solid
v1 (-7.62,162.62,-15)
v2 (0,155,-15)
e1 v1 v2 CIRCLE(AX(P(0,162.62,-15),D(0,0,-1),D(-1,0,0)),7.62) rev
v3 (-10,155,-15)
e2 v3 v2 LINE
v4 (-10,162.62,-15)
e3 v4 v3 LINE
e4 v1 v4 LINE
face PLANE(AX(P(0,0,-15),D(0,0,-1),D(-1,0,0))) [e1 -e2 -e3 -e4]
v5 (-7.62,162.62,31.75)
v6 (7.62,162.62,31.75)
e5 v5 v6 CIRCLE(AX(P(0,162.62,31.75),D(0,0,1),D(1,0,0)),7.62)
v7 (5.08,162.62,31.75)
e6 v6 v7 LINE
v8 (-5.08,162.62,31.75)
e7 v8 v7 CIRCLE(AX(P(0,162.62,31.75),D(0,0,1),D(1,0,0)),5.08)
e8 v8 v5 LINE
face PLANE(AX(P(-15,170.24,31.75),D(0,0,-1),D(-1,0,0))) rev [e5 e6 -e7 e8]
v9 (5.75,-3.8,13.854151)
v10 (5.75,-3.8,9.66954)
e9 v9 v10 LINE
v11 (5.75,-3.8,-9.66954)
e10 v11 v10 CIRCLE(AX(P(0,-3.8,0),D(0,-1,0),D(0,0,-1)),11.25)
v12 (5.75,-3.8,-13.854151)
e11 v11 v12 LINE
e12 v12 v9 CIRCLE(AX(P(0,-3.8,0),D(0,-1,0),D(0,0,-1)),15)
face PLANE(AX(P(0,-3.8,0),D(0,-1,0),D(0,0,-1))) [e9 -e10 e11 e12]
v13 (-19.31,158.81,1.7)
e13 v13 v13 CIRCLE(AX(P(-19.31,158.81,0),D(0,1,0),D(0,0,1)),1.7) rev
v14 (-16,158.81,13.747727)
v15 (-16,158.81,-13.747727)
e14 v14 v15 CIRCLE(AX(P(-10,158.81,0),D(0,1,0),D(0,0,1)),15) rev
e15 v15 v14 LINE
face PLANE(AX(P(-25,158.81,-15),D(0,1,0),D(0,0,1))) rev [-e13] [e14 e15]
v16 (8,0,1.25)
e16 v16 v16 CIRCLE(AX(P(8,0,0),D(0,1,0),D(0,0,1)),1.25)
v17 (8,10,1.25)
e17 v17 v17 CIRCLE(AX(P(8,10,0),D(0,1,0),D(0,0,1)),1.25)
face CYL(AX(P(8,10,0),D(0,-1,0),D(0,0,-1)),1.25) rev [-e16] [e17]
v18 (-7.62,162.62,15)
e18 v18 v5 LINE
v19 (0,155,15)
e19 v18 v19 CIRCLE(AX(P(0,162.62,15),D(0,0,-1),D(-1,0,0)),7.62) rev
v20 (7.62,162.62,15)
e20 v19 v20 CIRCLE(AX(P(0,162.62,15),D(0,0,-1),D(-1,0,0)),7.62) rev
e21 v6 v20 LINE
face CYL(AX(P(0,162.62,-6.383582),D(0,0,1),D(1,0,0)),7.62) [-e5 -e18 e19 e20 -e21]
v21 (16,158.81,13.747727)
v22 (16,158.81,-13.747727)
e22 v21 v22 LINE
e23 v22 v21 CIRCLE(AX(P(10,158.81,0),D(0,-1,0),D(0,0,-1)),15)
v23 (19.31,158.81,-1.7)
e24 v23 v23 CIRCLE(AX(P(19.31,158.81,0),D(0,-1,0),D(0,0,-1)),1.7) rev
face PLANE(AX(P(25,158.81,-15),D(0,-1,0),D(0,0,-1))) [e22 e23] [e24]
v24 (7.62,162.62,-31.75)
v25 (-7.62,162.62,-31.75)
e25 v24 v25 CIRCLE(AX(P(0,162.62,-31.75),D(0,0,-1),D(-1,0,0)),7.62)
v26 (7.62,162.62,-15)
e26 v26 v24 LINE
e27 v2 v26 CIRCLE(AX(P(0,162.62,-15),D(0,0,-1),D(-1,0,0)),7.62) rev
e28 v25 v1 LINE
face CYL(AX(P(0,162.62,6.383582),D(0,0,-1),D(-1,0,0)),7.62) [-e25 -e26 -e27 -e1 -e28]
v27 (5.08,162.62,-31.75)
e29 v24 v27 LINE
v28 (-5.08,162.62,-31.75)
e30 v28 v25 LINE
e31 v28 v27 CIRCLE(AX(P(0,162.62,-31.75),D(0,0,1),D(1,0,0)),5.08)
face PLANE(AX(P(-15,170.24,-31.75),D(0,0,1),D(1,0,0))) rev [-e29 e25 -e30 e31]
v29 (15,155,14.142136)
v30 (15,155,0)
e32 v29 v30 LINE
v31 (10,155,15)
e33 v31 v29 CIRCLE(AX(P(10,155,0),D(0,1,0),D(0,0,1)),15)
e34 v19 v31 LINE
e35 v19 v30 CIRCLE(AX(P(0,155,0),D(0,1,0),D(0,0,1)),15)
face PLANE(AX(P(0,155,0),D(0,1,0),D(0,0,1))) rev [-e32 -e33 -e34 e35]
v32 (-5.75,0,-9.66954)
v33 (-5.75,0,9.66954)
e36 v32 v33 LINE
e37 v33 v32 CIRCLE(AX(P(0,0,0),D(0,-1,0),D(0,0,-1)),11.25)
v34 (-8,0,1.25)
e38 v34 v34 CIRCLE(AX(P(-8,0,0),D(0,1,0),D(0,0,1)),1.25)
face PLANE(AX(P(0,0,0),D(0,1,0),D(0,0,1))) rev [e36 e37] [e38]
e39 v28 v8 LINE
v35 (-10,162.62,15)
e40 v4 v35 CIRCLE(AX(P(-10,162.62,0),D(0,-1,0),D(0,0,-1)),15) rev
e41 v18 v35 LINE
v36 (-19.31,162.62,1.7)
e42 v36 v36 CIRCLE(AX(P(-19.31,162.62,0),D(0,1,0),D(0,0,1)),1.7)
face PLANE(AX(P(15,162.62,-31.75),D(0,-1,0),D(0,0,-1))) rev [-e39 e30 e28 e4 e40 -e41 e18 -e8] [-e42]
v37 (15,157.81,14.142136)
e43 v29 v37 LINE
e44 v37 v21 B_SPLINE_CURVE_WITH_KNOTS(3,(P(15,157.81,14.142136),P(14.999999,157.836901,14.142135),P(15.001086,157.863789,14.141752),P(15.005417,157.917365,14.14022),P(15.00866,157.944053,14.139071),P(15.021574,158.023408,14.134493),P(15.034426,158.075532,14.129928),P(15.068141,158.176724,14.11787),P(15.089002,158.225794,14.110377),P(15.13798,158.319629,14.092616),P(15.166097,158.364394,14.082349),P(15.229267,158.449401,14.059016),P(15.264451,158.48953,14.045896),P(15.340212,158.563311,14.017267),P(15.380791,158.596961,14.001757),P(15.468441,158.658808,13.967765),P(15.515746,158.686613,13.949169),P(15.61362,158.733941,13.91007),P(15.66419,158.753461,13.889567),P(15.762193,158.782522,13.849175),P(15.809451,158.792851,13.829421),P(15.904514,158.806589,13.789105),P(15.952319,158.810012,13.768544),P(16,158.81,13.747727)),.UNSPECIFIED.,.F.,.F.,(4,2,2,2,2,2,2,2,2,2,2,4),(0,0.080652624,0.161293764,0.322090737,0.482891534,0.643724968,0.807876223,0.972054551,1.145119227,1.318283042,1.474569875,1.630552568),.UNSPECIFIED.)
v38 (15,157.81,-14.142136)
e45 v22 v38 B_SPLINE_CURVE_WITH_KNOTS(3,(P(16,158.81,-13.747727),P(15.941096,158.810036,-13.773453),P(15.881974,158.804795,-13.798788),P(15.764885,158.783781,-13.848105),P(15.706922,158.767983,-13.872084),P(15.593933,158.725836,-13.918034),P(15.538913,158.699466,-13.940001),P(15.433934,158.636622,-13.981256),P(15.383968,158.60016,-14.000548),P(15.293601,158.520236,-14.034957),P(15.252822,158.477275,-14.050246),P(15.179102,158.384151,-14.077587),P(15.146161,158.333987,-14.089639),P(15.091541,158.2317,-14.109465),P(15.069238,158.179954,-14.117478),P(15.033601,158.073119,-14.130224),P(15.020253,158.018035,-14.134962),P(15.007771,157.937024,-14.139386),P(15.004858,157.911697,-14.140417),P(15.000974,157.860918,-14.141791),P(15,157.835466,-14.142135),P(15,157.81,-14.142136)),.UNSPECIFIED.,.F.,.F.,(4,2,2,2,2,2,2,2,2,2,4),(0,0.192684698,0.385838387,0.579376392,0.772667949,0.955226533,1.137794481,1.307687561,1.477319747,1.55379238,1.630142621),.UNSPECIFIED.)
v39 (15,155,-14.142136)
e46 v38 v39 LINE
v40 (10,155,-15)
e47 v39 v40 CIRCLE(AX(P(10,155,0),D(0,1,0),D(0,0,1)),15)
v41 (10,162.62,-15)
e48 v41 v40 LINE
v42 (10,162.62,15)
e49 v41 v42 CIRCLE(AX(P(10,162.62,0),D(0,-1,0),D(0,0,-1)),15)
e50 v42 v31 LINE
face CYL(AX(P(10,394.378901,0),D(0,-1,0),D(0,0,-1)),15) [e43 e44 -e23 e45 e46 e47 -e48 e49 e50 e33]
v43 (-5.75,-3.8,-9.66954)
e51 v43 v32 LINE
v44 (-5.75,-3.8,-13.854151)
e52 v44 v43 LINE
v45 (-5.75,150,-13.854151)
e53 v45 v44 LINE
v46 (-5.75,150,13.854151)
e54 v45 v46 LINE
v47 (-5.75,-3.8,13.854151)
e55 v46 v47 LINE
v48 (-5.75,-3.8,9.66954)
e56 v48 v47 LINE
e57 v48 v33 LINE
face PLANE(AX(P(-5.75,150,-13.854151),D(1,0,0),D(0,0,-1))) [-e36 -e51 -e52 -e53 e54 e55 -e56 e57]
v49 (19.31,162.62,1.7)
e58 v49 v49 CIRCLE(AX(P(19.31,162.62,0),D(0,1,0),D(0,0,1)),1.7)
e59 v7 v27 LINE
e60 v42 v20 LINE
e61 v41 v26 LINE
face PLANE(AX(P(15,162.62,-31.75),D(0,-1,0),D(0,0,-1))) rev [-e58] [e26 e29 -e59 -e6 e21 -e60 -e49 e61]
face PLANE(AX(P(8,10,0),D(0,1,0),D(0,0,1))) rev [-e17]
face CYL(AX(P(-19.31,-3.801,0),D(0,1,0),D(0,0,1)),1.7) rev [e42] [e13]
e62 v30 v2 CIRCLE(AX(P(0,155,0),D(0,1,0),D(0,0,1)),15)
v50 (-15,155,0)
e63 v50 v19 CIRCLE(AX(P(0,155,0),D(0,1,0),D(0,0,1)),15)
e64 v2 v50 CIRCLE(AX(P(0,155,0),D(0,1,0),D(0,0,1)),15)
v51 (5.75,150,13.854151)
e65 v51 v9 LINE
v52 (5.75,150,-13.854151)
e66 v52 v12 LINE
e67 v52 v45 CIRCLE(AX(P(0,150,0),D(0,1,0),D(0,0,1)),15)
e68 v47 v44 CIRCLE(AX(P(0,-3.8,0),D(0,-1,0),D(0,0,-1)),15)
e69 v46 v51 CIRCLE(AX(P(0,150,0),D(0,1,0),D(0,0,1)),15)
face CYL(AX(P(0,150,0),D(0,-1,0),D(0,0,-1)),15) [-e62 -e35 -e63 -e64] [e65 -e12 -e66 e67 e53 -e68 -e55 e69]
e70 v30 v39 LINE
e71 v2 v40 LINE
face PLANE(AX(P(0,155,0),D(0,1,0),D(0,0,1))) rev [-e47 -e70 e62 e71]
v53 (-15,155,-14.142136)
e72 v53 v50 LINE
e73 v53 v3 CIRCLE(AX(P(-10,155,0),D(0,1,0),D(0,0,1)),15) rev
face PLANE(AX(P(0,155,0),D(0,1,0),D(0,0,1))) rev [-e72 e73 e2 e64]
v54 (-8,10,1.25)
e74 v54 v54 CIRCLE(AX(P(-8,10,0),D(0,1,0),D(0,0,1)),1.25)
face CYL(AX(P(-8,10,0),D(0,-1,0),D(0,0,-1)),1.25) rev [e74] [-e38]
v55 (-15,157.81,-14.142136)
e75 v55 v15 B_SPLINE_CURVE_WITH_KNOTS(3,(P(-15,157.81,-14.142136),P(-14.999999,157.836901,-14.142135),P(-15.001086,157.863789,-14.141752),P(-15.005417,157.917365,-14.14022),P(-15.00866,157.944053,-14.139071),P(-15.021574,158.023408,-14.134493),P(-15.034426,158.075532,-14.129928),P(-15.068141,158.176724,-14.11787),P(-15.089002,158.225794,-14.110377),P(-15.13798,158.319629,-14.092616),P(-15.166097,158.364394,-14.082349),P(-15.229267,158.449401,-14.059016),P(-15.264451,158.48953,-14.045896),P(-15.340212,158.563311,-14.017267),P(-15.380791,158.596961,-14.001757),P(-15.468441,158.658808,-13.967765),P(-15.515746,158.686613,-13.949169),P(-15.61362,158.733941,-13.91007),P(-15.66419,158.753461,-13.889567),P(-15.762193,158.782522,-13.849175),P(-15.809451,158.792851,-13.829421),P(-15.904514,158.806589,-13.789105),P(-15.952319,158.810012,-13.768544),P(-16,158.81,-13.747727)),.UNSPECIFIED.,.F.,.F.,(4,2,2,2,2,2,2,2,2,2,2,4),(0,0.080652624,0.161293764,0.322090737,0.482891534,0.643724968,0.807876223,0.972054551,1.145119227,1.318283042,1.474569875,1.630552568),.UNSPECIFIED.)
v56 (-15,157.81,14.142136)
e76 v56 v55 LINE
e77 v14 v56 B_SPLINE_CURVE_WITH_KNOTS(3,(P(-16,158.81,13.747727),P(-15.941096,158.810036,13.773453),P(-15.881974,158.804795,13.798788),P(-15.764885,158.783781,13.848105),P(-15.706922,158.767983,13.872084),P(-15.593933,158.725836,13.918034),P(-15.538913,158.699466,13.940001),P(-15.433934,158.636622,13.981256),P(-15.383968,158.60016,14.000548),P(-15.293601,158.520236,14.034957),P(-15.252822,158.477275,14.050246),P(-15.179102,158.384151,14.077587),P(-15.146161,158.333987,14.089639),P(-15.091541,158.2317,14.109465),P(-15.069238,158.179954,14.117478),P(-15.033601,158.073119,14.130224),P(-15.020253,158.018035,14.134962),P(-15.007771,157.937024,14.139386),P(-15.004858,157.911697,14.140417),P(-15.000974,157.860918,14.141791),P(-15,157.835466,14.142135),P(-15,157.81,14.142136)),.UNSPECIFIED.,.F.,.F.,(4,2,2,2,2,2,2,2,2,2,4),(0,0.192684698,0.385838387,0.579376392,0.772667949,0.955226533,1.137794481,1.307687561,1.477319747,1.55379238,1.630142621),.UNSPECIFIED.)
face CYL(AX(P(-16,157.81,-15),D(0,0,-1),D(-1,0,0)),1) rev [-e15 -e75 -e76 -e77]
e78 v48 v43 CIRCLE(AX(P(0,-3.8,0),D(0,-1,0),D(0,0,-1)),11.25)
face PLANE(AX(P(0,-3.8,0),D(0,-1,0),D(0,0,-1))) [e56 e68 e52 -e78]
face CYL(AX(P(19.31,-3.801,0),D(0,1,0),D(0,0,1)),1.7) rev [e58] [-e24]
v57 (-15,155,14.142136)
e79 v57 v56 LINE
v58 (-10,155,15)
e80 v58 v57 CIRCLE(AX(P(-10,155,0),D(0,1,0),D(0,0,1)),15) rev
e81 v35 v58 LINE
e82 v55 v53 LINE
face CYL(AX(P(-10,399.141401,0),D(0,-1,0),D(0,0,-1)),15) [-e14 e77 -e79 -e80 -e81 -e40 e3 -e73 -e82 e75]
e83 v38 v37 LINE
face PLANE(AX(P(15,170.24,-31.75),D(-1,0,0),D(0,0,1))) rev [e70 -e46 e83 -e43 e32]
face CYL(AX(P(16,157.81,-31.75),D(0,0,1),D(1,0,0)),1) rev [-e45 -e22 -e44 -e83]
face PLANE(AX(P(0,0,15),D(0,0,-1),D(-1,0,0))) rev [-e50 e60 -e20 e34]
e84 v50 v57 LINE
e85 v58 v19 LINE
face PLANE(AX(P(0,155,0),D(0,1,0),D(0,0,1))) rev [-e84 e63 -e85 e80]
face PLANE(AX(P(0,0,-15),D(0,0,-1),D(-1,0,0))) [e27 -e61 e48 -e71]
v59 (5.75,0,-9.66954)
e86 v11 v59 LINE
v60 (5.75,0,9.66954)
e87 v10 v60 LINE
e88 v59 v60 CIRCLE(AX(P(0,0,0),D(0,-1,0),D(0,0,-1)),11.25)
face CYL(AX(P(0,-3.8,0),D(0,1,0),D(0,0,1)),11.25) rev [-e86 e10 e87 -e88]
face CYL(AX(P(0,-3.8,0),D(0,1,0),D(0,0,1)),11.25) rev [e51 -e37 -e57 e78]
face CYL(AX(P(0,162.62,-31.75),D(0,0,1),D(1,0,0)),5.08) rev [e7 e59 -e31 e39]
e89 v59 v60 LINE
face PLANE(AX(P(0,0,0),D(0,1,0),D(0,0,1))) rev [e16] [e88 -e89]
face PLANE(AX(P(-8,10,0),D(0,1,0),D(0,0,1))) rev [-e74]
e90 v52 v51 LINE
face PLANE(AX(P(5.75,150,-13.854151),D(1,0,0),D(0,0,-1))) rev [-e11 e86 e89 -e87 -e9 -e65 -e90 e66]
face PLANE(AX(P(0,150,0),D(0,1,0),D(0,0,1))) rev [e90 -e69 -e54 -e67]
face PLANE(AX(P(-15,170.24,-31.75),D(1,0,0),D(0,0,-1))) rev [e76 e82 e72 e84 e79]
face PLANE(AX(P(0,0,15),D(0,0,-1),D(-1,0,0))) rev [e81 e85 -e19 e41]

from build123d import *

# Parameters (mm, degrees)
BOSS_EXTRUDE1_DEPTH   = 150
BOSS_EXTRUDE1_2_DEPTH = 150
SKETCH2_R             = 15
BOSS_EXTRUDE2_DEPTH   = 5
SKETCH3_W             = 30
SKETCH3_H             = 63.5
BOSS_EXTRUDE3_DEPTH   = 15.24
SKETCH4_R             = 5.08
CUT_EXTRUDE1_DEPTH    = 183.315406919
CUT_EXTRUDE3_START    = -16.75
CUT_EXTRUDE3_DEPTH    = 16.75
CUT_EXTRUDE4_START    = -16.75
CUT_EXTRUDE4_DEPTH    = 16.75
SKETCH7_W             = 63.5
SKETCH7_H             = 7.62
CUT_EXTRUDE5_DEPTH    = 176.754715726
SKETCH8_W             = 30
SKETCH8_H             = 3.81
BOSS_EXTRUDE4_DEPTH   = 10
CUT_EXTRUDE6_START    = -7.62
CUT_EXTRUDE6_DEPTH    = 7.62
SKETCH1_4_R           = 1.25
CUT_EXTRUDE7_DEPTH    = 10
BOSS_EXTRUDE5_START   = 3.8
BOSS_EXTRUDE5_DEPTH   = 3.8
FILLET1_R             = 1
CUT_EXTRUDE8_REACH    = 173.256
SKETCH9_R             = 1.7


# Read off the part's stored shape, not the designer's step: Cut-Extrude6
with BuildPart() as part:
    # Sketch1 → Boss-Extrude1 (new body)
    with BuildSketch(Plane(origin=(0, 0, 0), x_dir=(1, 0, 0), z_dir=(0, 1, 0))):
        with BuildLine():
            Line((-5.75, 13.854151002), (-5.75, -13.854151002))
            ThreePointArc((-5.75, -13.854151002), (-15, 0), (-5.75, 13.854151002))
        make_face()
    extrude(amount=BOSS_EXTRUDE1_DEPTH)



with BuildPart() as body_2:
    # Sketch1 → Boss-Extrude1 2 (new body)
    with BuildSketch(Plane(origin=(0, 0, 0), x_dir=(1, 0, 0), z_dir=(0, 1, 0))):
        with BuildLine():
            Line((5.75, 13.854151002), (5.75, -13.854151002))
            ThreePointArc((5.75, -13.854151002), (15, 0), (5.75, 13.854151002))
        make_face()
    extrude(amount=BOSS_EXTRUDE1_2_DEPTH)


with BuildPart() as part_1:
    add(part.part)

    add(body_2.part)  # Boss-Extrude2 merges body 2
    # Sketch2 → Boss-Extrude2 (add)
    with BuildSketch(Plane(origin=(0, 150, 0), x_dir=(1, 0, 0), z_dir=(0, 1, 0))):
        with Locations(Location((0, 0, 0), (0, 0, 112.540310464))):
            Circle(SKETCH2_R)
    extrude(amount=BOSS_EXTRUDE2_DEPTH)

    # Sketch3 → Boss-Extrude3 (add)
    with BuildSketch(Plane(origin=(0, 155, 0), x_dir=(1, 0, 0), z_dir=(0, 1, 0))):
        Rectangle(SKETCH3_W, SKETCH3_H)
    extrude(amount=BOSS_EXTRUDE3_DEPTH)

    # Sketch4 → Cut-Extrude1 (cut, through all)
    with BuildSketch(Plane.XY.offset(31.75)):
        with Locations((0, 162.62)):
            Circle(SKETCH4_R)
    extrude(amount=-CUT_EXTRUDE1_DEPTH, mode=Mode.SUBTRACT)

    # Sketch6 → Cut-Extrude3 (cut)
    with BuildSketch(Plane(origin=(0, 0, -31.75), x_dir=(-1, 0, 0), z_dir=(0, 0, -1)).offset(CUT_EXTRUDE3_START)):
        with BuildLine():
            ThreePointArc((-9.9e-08, 170.24), (7.62, 162.62000005), (0, 155))
            Line((0, 155), (15, 155))
            Line((15, 155), (15, 170.24))
            Line((15, 170.24), (-9.9e-08, 170.24))
        make_face()
        with BuildLine():
            ThreePointArc((0, 155), (-7.62, 162.61999995), (-9.9e-08, 170.24))
            Line((-9.9e-08, 170.24), (-15, 170.24))
            Line((-15, 170.24), (-15, 155))
            Line((-15, 155), (0, 155))
        make_face()
    extrude(amount=CUT_EXTRUDE3_DEPTH, mode=Mode.SUBTRACT)

    # Sketch4<4> → Cut-Extrude4 (cut)
    with BuildSketch(Plane.XY.offset(31.75).offset(CUT_EXTRUDE4_START)):
        with BuildLine():
            ThreePointArc((-9.9e-08, 170.24), (7.62, 162.62000005), (0, 155))
            Line((0, 155), (15, 155))
            Line((15, 155), (15, 170.24))
            Line((15, 170.24), (-9.9e-08, 170.24))
        make_face()
        with BuildLine():
            ThreePointArc((0, 155), (-7.62, 162.61999995), (-9.9e-08, 170.24))
            Line((-9.9e-08, 170.24), (-15, 170.24))
            Line((-15, 170.24), (-15, 155))
            Line((-15, 155), (0, 155))
        make_face()
    extrude(amount=CUT_EXTRUDE4_DEPTH, mode=Mode.SUBTRACT)

    # Sketch7 → Cut-Extrude5 (cut, through all)
    with BuildSketch(Plane.ZY.offset(15)):
        with Locations((0, 166.43)):
            Rectangle(SKETCH7_W, SKETCH7_H)
    extrude(amount=-CUT_EXTRUDE5_DEPTH, mode=Mode.SUBTRACT)

    # Sketch8 → Boss-Extrude4 (add)
    with BuildSketch(Plane.ZY.offset(15)):
        with Locations((0, 160.715)):
            Rectangle(SKETCH8_W, SKETCH8_H)
    boss_extrude4 = extrude(amount=BOSS_EXTRUDE4_DEPTH)

    # Mirror2: Boss-Extrude4 across plane
    add(boss_extrude4.mirror(Plane(origin=(0, 0, 0), x_dir=(0, 0, 1), z_dir=(1, 0, 0))))

    # Cut-Extrude6 outline → Cut-Extrude6 (cut)
    with BuildSketch(Plane(origin=(0, 162.62, 0), x_dir=(1, 0, 0), z_dir=(0, 1, 0)).offset(CUT_EXTRUDE6_START)):
        with BuildLine():
            Line((25, 15), (10, 15))
            ThreePointArc((10, 15), (20.606601718, 10.606601718), (25, 0))
            Line((25, 0), (25, 15))
        make_face()
        with BuildLine():
            Line((25, -15), (25, 0))
            ThreePointArc((25, 0), (20.606601718, -10.606601718), (10, -15))
            Line((10, -15), (25, -15))
        make_face()
    cut_extrude6 = extrude(amount=CUT_EXTRUDE6_DEPTH, mode=Mode.SUBTRACT)

    # Mirror3: Cut-Extrude6 across plane
    add(cut_extrude6.mirror(Plane(origin=(0, 0, 0), x_dir=(0, 0, 1), z_dir=(1, 0, 0))), mode=Mode.SUBTRACT)

    # Sketch1<4> → Cut-Extrude7 (cut)
    with BuildSketch(Plane(origin=(0, 0, 0), x_dir=(1, 0, 0), z_dir=(0, 1, 0))):
        with Locations(Location((-8, 0, 0), (0, 0, 270))):
            Circle(SKETCH1_4_R)
        with Locations(Location((8, 0, 0), (0, 0, 270))):
            Circle(SKETCH1_4_R)
    extrude(amount=CUT_EXTRUDE7_DEPTH, mode=Mode.SUBTRACT)

    # Sketch12 → Boss-Extrude5 (add)
    with BuildSketch(Plane.XZ.offset(BOSS_EXTRUDE5_START)):
        with BuildLine():
            Line((-5.75, 9.669539803), (-5.75, 13.854151002))
            ThreePointArc((-5.75, 13.854151002), (-15, 0), (-5.75, -13.854151002))
            Line((-5.75, -13.854151002), (-5.75, -9.669539803))
            ThreePointArc((-5.75, -9.669539803), (-11.25, 0), (-5.75, 9.669539803))
        make_face()
        with BuildLine():
            ThreePointArc((5.75, -13.854151002), (15, 0), (5.75, 13.854151002))
            Line((5.75, 13.854151002), (5.75, 9.669539803))
            ThreePointArc((5.75, 9.669539803), (11.25, 0), (5.75, -9.669539803))
            Line((5.75, -9.669539803), (5.75, -13.854151002))
        make_face()
    extrude(amount=-BOSS_EXTRUDE5_DEPTH)

    # Fillet1
    fillet1_edges = [part_1.edges().sort_by_distance(p)[0] for p in [
        (15, 158.81, 0),
        (-15, 158.81, 0),
    ]]
    fillet(fillet1_edges, radius=FILLET1_R)

    # Sketch9 → Cut-Extrude8 (cut, up to next)
    with BuildSketch(Plane(origin=(0, 162.62, 0), x_dir=(1, 0, 0), z_dir=(0, 1, 0)), mode=Mode.PRIVATE) as cut_extrude8_sk1:
        with Locations(Location((-19.31, 0, 0), (0, 0, 270))):
            Circle(SKETCH9_R)
    cut_extrude8_tool1 = extrude(cut_extrude8_sk1.sketch, amount=-CUT_EXTRUDE8_REACH, mode=Mode.PRIVATE) & part_1.part
    # Sketch9 → Cut-Extrude8 (cut, up to next)
    with BuildSketch(Plane(origin=(0, 162.62, 0), x_dir=(1, 0, 0), z_dir=(0, 1, 0)), mode=Mode.PRIVATE) as cut_extrude8_sk2:
        with Locations(Location((19.31, 0, 0), (0, 0, 270))):
            Circle(SKETCH9_R)
    cut_extrude8_tool2 = extrude(cut_extrude8_sk2.sketch, amount=-CUT_EXTRUDE8_REACH, mode=Mode.PRIVATE) & part_1.part
    add(cut_extrude8_tool1.solids().sort_by_distance((-19.31, 162.62, 0))[0], mode=Mode.SUBTRACT)
    add(cut_extrude8_tool2.solids().sort_by_distance((19.31, 162.62, 0))[0], mode=Mode.SUBTRACT)


solid = part_1.part
